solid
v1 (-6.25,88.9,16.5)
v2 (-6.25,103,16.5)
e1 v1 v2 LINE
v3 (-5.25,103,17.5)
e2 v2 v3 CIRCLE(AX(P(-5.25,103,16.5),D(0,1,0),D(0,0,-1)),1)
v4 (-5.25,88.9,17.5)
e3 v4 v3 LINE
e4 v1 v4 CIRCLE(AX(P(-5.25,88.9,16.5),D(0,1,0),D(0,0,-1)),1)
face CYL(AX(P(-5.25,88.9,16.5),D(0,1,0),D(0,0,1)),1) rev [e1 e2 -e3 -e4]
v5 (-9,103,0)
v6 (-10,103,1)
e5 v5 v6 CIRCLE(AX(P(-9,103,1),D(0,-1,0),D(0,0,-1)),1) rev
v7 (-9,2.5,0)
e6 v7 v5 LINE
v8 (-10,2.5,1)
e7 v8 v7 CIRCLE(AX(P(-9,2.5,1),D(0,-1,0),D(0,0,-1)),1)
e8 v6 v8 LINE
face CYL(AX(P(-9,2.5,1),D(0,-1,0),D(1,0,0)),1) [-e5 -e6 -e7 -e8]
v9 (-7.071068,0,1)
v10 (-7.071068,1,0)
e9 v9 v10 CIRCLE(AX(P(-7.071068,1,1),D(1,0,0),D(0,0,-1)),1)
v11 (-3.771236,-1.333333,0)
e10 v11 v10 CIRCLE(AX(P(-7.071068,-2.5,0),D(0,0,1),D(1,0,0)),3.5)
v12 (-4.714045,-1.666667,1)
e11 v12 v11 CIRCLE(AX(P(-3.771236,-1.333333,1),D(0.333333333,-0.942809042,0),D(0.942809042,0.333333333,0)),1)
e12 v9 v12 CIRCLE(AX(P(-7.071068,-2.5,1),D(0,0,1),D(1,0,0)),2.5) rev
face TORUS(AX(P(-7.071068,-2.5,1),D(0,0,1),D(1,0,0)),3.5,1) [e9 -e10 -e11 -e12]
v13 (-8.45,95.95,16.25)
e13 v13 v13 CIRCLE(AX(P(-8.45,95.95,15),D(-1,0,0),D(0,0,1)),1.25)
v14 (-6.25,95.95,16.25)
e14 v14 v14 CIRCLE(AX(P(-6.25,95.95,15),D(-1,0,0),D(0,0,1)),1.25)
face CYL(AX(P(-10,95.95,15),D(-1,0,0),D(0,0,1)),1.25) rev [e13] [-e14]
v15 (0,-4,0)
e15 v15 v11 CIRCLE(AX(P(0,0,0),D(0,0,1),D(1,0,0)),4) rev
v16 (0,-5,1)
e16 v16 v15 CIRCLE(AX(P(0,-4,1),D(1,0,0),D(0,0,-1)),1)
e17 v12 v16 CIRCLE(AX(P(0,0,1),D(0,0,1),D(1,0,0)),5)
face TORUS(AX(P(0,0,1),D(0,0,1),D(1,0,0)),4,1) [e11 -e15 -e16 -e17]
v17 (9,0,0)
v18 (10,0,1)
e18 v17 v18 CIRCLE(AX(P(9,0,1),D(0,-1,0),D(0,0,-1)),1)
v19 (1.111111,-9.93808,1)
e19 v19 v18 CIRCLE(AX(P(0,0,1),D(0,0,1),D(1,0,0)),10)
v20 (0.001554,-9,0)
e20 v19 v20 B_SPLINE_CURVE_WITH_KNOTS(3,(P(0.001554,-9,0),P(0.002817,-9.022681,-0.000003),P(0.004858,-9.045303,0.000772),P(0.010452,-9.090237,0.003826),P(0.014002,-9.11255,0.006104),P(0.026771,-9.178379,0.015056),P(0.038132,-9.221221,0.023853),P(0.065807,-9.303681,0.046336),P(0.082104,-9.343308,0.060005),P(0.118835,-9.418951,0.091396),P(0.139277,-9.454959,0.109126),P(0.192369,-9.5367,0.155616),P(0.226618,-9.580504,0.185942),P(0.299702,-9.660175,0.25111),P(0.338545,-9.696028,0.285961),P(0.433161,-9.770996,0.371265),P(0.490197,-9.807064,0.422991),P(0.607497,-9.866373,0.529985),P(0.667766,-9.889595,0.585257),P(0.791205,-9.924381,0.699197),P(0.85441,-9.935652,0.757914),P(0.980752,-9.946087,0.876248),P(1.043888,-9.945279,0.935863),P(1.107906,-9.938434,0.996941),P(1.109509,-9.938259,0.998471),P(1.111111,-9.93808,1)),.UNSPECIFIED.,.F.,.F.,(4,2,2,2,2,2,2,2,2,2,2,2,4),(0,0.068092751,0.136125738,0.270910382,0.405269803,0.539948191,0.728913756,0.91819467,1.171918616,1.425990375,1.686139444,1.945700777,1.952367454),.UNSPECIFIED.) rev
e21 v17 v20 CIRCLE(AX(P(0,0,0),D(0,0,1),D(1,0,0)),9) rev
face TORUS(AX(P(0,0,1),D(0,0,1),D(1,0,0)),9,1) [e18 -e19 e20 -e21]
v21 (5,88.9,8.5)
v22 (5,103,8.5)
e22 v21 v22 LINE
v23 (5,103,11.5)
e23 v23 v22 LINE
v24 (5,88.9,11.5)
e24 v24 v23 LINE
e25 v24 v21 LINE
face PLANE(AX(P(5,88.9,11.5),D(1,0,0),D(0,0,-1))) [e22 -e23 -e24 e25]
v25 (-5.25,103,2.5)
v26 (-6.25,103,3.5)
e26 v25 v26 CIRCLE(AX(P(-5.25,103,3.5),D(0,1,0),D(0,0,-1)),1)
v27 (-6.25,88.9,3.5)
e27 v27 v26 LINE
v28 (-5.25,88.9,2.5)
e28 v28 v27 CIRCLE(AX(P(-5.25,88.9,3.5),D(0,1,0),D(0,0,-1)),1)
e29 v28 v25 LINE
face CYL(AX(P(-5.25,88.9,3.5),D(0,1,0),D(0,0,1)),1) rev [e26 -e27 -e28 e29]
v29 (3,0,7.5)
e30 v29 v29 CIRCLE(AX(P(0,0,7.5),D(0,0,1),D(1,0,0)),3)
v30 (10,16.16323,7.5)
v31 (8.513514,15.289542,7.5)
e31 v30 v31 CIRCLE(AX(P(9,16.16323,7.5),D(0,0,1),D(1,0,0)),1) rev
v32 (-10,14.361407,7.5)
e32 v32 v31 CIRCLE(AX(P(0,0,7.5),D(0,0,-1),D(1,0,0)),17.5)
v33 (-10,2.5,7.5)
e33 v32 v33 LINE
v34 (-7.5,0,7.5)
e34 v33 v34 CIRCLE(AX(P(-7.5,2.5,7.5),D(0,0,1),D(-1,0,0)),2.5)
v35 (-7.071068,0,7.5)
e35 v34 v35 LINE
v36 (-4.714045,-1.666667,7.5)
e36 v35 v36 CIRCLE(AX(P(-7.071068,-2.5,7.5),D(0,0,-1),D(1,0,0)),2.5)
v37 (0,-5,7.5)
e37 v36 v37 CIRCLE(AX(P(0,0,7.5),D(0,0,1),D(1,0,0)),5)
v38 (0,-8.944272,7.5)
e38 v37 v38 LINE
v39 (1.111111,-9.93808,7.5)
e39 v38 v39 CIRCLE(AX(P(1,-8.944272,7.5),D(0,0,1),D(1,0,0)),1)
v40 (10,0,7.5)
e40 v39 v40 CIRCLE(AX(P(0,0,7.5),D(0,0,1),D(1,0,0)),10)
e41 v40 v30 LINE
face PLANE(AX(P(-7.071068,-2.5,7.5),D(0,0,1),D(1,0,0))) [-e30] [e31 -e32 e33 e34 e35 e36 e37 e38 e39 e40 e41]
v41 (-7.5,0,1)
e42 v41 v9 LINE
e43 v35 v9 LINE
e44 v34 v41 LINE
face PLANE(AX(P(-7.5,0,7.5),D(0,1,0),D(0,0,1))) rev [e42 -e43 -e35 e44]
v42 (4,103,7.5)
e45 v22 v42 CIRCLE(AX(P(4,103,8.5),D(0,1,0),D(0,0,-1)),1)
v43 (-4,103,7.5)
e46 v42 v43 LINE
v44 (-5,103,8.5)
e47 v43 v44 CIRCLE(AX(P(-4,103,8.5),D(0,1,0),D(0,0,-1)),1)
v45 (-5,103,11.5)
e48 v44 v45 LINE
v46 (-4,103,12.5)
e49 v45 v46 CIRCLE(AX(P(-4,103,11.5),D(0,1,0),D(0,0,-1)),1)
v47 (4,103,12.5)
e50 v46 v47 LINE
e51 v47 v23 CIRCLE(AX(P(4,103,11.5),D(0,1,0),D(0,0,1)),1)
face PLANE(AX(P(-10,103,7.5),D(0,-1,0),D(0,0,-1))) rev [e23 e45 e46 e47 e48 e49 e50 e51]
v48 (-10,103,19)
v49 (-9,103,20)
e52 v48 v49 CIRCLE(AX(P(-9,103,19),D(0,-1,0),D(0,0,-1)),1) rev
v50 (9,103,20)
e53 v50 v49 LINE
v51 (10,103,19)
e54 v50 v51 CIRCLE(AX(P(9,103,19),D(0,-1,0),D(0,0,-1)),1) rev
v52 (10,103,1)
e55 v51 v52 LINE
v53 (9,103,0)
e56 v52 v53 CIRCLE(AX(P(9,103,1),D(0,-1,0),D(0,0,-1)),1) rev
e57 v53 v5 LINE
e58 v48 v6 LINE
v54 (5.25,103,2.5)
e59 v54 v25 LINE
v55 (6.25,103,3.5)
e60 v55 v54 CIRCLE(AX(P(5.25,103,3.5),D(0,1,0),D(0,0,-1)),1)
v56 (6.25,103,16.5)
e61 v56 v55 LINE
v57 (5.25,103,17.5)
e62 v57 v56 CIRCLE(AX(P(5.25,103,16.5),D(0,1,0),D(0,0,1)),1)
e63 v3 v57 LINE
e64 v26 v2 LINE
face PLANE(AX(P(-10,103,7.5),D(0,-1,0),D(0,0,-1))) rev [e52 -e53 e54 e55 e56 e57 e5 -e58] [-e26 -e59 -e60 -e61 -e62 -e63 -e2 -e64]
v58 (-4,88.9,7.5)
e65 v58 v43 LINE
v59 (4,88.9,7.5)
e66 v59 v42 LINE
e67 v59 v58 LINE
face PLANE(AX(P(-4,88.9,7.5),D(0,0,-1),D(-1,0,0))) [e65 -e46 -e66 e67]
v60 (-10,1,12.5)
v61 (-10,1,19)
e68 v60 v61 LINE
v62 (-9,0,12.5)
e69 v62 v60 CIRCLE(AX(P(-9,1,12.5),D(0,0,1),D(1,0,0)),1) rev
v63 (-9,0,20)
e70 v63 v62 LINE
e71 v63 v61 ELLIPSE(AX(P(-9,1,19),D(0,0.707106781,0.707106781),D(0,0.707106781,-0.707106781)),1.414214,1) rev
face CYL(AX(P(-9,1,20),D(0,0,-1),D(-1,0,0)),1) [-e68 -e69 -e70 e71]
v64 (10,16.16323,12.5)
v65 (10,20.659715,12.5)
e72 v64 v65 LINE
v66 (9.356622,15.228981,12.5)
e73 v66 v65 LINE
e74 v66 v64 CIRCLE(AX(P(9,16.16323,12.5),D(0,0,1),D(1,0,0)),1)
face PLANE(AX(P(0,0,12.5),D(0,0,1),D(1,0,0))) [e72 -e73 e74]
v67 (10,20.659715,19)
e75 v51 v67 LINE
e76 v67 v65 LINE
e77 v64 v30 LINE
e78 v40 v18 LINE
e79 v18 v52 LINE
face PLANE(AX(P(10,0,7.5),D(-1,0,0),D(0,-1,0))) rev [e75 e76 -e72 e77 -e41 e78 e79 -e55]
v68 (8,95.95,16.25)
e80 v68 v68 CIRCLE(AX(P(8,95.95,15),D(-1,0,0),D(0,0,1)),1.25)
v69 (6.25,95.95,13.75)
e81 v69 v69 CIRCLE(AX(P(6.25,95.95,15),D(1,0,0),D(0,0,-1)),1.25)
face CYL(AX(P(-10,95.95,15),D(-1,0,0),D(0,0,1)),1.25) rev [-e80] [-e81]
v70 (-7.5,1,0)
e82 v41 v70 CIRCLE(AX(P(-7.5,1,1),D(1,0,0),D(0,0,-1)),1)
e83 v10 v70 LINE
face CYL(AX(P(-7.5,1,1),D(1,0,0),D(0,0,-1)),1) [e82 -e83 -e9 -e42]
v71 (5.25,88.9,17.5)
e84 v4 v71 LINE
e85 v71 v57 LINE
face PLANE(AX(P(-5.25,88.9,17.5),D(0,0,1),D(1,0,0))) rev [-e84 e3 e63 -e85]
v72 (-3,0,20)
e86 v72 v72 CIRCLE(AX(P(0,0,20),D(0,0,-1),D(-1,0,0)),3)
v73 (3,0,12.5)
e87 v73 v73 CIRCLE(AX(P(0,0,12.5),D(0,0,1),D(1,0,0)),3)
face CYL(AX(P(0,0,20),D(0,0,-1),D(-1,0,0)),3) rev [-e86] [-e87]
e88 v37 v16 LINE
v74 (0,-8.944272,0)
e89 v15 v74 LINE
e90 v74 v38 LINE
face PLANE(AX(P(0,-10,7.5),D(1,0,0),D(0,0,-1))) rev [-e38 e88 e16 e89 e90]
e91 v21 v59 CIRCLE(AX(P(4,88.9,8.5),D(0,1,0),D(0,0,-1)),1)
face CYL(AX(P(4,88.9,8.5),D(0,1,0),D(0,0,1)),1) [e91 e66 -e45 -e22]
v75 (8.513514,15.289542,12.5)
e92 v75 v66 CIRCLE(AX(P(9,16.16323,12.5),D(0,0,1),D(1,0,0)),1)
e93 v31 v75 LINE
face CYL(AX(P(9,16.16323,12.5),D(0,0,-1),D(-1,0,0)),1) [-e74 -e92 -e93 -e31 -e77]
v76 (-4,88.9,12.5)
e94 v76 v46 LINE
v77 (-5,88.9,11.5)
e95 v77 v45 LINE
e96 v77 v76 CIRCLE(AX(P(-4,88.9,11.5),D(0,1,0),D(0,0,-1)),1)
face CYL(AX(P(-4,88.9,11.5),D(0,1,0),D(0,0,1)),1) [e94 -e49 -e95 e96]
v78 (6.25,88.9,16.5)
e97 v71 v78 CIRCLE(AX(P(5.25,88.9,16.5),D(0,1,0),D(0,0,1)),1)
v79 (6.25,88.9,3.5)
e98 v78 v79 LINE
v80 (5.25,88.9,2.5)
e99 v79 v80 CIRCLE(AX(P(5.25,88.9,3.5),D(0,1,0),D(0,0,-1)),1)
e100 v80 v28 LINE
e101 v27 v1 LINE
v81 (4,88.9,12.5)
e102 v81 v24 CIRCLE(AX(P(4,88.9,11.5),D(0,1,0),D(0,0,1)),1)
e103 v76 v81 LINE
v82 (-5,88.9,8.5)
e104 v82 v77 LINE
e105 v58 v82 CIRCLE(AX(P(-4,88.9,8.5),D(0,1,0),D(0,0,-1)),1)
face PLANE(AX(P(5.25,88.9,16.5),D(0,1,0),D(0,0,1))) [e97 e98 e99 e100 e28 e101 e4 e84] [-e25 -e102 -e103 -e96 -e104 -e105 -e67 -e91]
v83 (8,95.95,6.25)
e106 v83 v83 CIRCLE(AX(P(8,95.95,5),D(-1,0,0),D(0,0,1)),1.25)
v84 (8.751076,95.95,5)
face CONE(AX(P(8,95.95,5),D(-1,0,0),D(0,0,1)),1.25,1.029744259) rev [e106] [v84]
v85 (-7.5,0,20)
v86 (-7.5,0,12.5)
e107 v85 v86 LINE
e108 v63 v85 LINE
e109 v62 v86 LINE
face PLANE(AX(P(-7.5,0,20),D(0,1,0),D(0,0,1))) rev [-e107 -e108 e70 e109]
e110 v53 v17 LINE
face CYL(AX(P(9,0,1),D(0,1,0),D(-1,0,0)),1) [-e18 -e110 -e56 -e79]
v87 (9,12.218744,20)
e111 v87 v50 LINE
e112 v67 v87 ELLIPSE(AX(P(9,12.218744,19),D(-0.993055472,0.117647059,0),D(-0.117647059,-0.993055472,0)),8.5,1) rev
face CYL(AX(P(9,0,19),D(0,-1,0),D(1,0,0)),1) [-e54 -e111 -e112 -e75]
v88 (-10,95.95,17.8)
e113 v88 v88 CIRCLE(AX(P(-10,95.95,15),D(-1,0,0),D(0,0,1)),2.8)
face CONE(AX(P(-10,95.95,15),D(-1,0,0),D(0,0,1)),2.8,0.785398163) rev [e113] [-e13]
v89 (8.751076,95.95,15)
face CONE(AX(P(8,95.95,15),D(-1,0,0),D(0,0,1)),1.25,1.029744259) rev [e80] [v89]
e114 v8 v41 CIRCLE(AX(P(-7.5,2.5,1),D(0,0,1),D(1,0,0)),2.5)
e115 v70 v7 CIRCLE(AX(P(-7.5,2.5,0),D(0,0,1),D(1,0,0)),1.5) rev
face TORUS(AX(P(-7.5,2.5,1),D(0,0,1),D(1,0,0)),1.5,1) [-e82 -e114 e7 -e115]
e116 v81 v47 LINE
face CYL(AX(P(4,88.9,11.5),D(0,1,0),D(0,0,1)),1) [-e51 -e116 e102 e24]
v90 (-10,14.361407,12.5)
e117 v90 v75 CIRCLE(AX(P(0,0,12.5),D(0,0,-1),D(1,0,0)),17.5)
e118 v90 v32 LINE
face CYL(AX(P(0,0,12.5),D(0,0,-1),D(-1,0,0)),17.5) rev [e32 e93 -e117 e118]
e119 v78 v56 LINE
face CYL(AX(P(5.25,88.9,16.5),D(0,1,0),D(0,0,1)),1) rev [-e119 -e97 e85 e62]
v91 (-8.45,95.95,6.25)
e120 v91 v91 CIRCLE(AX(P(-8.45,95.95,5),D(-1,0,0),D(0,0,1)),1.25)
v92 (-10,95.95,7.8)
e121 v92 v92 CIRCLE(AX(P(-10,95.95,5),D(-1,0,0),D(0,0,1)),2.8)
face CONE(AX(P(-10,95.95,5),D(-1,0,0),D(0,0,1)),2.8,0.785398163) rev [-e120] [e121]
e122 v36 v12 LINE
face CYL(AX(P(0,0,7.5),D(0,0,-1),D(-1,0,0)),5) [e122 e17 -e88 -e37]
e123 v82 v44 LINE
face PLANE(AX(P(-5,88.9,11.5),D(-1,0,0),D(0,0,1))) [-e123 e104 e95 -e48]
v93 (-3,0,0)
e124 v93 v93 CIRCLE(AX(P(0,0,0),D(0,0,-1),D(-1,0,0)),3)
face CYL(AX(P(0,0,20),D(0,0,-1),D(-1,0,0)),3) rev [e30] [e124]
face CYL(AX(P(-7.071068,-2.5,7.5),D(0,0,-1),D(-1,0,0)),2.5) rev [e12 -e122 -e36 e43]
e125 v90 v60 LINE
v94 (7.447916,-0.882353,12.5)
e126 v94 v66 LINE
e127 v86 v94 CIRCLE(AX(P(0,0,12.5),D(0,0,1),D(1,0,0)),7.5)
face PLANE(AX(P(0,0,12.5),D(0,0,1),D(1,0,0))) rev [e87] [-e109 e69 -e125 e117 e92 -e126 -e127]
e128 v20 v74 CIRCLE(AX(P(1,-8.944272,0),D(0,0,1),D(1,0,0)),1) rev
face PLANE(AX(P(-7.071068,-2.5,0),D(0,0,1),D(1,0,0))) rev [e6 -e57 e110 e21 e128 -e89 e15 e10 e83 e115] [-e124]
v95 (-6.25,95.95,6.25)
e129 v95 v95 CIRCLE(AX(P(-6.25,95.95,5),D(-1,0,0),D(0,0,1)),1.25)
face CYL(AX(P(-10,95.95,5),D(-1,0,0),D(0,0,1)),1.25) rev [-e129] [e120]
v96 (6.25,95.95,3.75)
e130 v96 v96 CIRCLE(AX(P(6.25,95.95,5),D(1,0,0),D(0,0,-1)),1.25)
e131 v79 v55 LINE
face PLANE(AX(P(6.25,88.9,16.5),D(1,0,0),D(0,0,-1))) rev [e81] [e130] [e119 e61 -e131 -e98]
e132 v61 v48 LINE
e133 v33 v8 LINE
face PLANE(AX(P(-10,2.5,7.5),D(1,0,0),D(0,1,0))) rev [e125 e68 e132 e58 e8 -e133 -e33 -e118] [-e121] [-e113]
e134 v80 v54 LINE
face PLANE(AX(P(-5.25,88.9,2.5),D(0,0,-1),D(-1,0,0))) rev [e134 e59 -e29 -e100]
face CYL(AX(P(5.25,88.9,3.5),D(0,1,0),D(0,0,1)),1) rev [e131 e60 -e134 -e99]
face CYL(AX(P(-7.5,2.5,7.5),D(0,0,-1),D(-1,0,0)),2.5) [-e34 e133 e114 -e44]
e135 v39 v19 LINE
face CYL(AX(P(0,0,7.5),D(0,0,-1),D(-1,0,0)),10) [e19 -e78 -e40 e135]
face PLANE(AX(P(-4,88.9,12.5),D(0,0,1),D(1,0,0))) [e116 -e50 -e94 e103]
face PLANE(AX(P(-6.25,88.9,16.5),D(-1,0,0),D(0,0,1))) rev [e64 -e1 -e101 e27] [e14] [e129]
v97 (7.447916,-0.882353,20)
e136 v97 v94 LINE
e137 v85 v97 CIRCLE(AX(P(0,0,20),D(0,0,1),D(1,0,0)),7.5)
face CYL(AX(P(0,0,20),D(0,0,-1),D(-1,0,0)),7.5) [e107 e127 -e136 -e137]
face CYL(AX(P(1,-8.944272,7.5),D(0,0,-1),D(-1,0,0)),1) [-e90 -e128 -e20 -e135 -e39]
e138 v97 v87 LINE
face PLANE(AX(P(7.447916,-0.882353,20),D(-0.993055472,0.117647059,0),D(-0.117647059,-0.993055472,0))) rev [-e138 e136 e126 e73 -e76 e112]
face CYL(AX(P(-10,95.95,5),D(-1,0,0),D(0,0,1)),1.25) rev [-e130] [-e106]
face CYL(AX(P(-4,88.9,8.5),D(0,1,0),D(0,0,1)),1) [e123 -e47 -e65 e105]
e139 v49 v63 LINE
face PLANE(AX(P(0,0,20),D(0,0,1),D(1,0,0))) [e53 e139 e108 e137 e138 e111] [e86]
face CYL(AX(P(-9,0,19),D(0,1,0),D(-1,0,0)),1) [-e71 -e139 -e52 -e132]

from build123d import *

# Parameters (mm, degrees)
BOSS_EXTRUDE1_DEPTH             = 7.5
BOSS_EXTRUDE2_DEPTH             = 5
BOSS_EXTRUDE3_DEPTH             = 7.5
SKETCH4_R                       = 3
CUT_EXTRUDE1_DEPTH              = 106.399240984
CUT_EXTRUDE2_DEPTH              = 14.1
FILLET1_R                       = 1
M3X0_5_TAPPED_HOLE1_D           = 2.5
M3X0_5_TAPPED_HOLE1_DEPTH       = 18
M3X0_5_TAPPED_HOLE1_CSINK_D     = 5.6
M3X0_5_TAPPED_HOLE1_CSINK_ANGLE = 90
M3X0_5_TAPPED_HOLE1_TIP         = 0.751075774


with BuildPart() as part:
    # Sketch1 → Boss-Extrude1 (new body)
    with BuildSketch(Plane.XY):
        with BuildLine():
            Line((0, -10), (0, -5))
            ThreePointArc((0, -5), (-2.886751346, -4.082482905), (-4.714045208, -1.666666667))
            ThreePointArc((-4.714045208, -1.666666667), (-5.627692139, -0.458758548), (-7.071067812, 0))
            Line((-7.071067812, 0), (-7.5, 0))
            ThreePointArc((-7.5, 0), (-9.267766953, 0.732233047), (-10, 2.5))
            Line((-10, 2.5), (-10, 103))
            Line((-10, 103), (10, 103))
            Line((10, 103), (10, 0))
            ThreePointArc((10, 0), (7.071067812, -7.071067812), (0, -10))
        make_face()
    extrude(amount=BOSS_EXTRUDE1_DEPTH)

    # Sketch2 → Boss-Extrude2 (add)
    with BuildSketch(Plane.XY.offset(7.5)):
        with BuildLine():
            Line((-10, 103), (10, 103))
            Line((10, 103), (10, 14.361406616))
            ThreePointArc((10, 14.361406616), (0, 17.5), (-10, 14.361406616))
            Line((-10, 14.361406616), (-10, 103))
        make_face()
    extrude(amount=BOSS_EXTRUDE2_DEPTH)

    # Sketch3 → Boss-Extrude3 (add)
    with BuildSketch(Plane.XY.offset(12.5)):
        with BuildLine():
            Line((7.447916037, -0.882352941), (10, 20.659715081))
            Line((10, 20.659715081), (10, 103))
            Line((10, 103), (-10, 103))
            Line((-10, 103), (-10, 0))
            Line((-10, 0), (-7.5, 0))
            ThreePointArc((-7.5, 0), (-0.441944412, -7.486967686), (7.447916037, -0.882352941))
        make_face()
    extrude(amount=BOSS_EXTRUDE3_DEPTH)

    # Sketch4 → Cut-Extrude1 (cut, through all)
    with BuildSketch(Plane(origin=(0, 0, 0), x_dir=(-1, 0, 0), z_dir=(0, 0, -1))):
        Circle(SKETCH4_R)
    extrude(amount=-CUT_EXTRUDE1_DEPTH, mode=Mode.SUBTRACT)

    # Sketch5 → Cut-Extrude2 (cut)
    with BuildSketch(Plane(origin=(0, 103, 0), x_dir=(1, 0, 0), z_dir=(0, 1, 0))):
        with BuildLine():
            Line((-5.25, -17.5), (5.25, -17.5))
            ThreePointArc((5.25, -17.5), (5.957106781, -17.207106781), (6.25, -16.5))
            Line((6.25, -16.5), (6.25, -3.5))
            ThreePointArc((6.25, -3.5), (5.957106781, -2.792893219), (5.25, -2.5))
            Line((5.25, -2.5), (-5.25, -2.5))
            ThreePointArc((-5.25, -2.5), (-5.957106781, -2.792893219), (-6.25, -3.5))
            Line((-6.25, -3.5), (-6.25, -16.5))
            ThreePointArc((-6.25, -16.5), (-5.957106781, -17.207106781), (-5.25, -17.5))
        make_face()
        with BuildLine():
            Line((-4, -12.5), (4, -12.5))
            ThreePointArc((4, -12.5), (4.707106781, -12.207106781), (5, -11.5))
            Line((5, -11.5), (5, -8.5))
            ThreePointArc((5, -8.5), (4.707106781, -7.792893219), (4, -7.5))
            Line((4, -7.5), (-4, -7.5))
            ThreePointArc((-4, -7.5), (-4.707106781, -7.792893219), (-5, -8.5))
            Line((-5, -8.5), (-5, -11.5))
            ThreePointArc((-5, -11.5), (-4.707106781, -12.207106781), (-4, -12.5))
        make_face(mode=Mode.SUBTRACT)
    extrude(amount=-CUT_EXTRUDE2_DEPTH, mode=Mode.SUBTRACT)

    # Fillet1
    # the kernel refuses this fillet: 1 mm, written as the material it takes off along each edge
    with BuildSketch(Plane(origin=(10, 105.5, 0), x_dir=(-1, 0, 0), z_dir=(0, -1, 0))) as fillet1_piece_1:
        with BuildLine():
            CenterArc((FILLET1_R, -FILLET1_R), FILLET1_R, 90, 90)
            Line((0, -FILLET1_R), (0, 0))
            Line((0, 0), (FILLET1_R, 0))
        make_face()
    extrude(amount=105.5, mode=Mode.SUBTRACT)
    with BuildSketch(Plane(origin=(0, 0, 0), x_dir=(1, 0, 0), z_dir=(0, 1, 0))) as fillet1_piece_2:
        with BuildLine():
            CenterArc((10 - FILLET1_R, -FILLET1_R), FILLET1_R, 0, 90)
            Line((10 - FILLET1_R, 0), (10, 0))
            Line((10, 0), (10, -FILLET1_R))
        make_face()
    revolve(axis=Axis((0, 0, 0), (0, 0, -1)), revolution_arc=104.329698924, mode=Mode.SUBTRACT)
    with BuildSketch(Plane(origin=(0, 0, 0), x_dir=(0, -1, 0), z_dir=(1, 0, 0))) as fillet1_piece_3:
        with BuildLine():
            CenterArc((5 - FILLET1_R, -FILLET1_R), FILLET1_R, 0, 90)
            Line((5 - FILLET1_R, 0), (5, 0))
            Line((5, 0), (5, -FILLET1_R))
        make_face()
    revolve(axis=Axis((0, 0, 0), (0, 0, -1)), revolution_arc=70.528779366, mode=Mode.SUBTRACT)
    with BuildSketch(Plane(origin=(-7.071067812, -2.5, 0), x_dir=(0.9428090415820636, 0.3333333333333328, 0), z_dir=(0.3333333333333328, -0.9428090415820636, 0))) as fillet1_piece_4:
        with BuildLine():
            CenterArc((2.5 + FILLET1_R, FILLET1_R), FILLET1_R, 180, 90)
            Line((2.5, FILLET1_R), (2.5, 0))
            Line((2.5, 0), (2.5 + FILLET1_R, 0))
        make_face()
    revolve(axis=Axis((-7.071067812, -2.5, 0), (0, 0, 1)), revolution_arc=70.528779366, mode=Mode.SUBTRACT)
    with BuildSketch(Plane(origin=(0, -10, -2.782087795), x_dir=(0, 1, 0), z_dir=(0, 0, 1))) as fillet1_piece_5:
        with BuildLine():
            CenterArc((1.05572809, -1), FILLET1_R, 90, 96.379370208)
            ThreePointArc((0.0619201, -1.111111111), (0.015492025, -0.556417559), (0, 0))
            Line((0, 0), (1.05572809, 0))
        make_face()
    extrude(amount=13.06417559, mode=Mode.SUBTRACT)
    with BuildSketch(Plane(origin=(10, 14.361406616, 7.5), x_dir=(0, 1, 0), z_dir=(0, 0, 1))) as fillet1_piece_6:
        with BuildLine():
            CenterArc((1.801823259, 1), FILLET1_R, 150.89009106, 119.10990894)
            ThreePointArc((0.928135158, 1.486486486), (0.482686338, 0.731618028), (0, 0))
            Line((0, 0), (1.801823259, 0))
        make_face()
    extrude(amount=5, mode=Mode.SUBTRACT)
    with BuildSketch(Plane(origin=(-10, 0, 10), x_dir=(0, 1, 0), z_dir=(0, 0, 1))) as fillet1_piece_7:
        with BuildLine():
            CenterArc((FILLET1_R, -FILLET1_R), FILLET1_R, 90, 90)
            Line((0, -FILLET1_R), (0, 0))
            Line((0, 0), (FILLET1_R, 0))
        make_face()
    extrude(amount=12.5, mode=Mode.SUBTRACT)
    with BuildSketch(Plane(origin=(10, 8.159715081, 20), x_dir=(0, 0, -1), z_dir=(0, 1, 0))) as fillet1_piece_8:
        with BuildLine():
            CenterArc((FILLET1_R, FILLET1_R), FILLET1_R, 180, 90)
            Line((0, FILLET1_R), (0, 0))
            Line((0, 0), (FILLET1_R, 0))
        make_face()
    extrude(amount=97.340284919, mode=Mode.SUBTRACT)
    with BuildSketch(Plane(origin=(-10, 105.5, 20), x_dir=(0, 0, -1), z_dir=(0, -1, 0))) as fillet1_piece_9:
        with BuildLine():
            CenterArc((FILLET1_R, FILLET1_R), FILLET1_R, 180, 90)
            Line((0, FILLET1_R), (0, 0))
            Line((0, 0), (FILLET1_R, 0))
        make_face()
    extrude(amount=108, mode=Mode.SUBTRACT)
    with BuildSketch(Plane(origin=(-7.071067812, 0, 0), x_dir=(0, 1, 0), z_dir=(-1, 0, 0))) as fillet1_piece_10:
        with BuildLine():
            CenterArc((FILLET1_R, -FILLET1_R), FILLET1_R, 90, 90)
            Line((0, -FILLET1_R), (0, 0))
            Line((0, 0), (FILLET1_R, 0))
        make_face()
    extrude(amount=0.428932188, mode=Mode.SUBTRACT)
    with BuildSketch(Plane(origin=(-7.5, 2.5, 0), x_dir=(0, -1, 0), z_dir=(1, 0, 0))) as fillet1_piece_11:
        with BuildLine():
            CenterArc((2.5 - FILLET1_R, -FILLET1_R), FILLET1_R, 0, 90)
            Line((2.5, -FILLET1_R), (2.5, 0))
            Line((2.5, 0), (2.5 - FILLET1_R, 0))
        make_face()
    revolve(axis=Axis((-7.5, 2.5, 0), (0, 0, -1)), revolution_arc=90, mode=Mode.SUBTRACT)
    with BuildSketch(Plane(origin=(-10, 2.5, 0), x_dir=(1, 0, 0), z_dir=(0, 1, 0))) as fillet1_piece_12:
        with BuildLine():
            CenterArc((FILLET1_R, -FILLET1_R), FILLET1_R, 90, 90)
            Line((0, -FILLET1_R), (0, 0))
            Line((0, 0), (FILLET1_R, 0))
        make_face()
    extrude(amount=103, mode=Mode.SUBTRACT)

    # M3x0.5 Tapped Hole1
    with Locations(Plane.ZY.offset(10)):
        with Locations((15, 95.95), (5, 95.95)):
            CounterSinkHole(M3X0_5_TAPPED_HOLE1_D / 2, M3X0_5_TAPPED_HOLE1_CSINK_D / 2, depth=M3X0_5_TAPPED_HOLE1_DEPTH, counter_sink_angle=M3X0_5_TAPPED_HOLE1_CSINK_ANGLE)
            with Locations((0, 0, -(M3X0_5_TAPPED_HOLE1_DEPTH + M3X0_5_TAPPED_HOLE1_TIP / 2))):  # 118° drill point
                Cone(0, M3X0_5_TAPPED_HOLE1_D / 2, M3X0_5_TAPPED_HOLE1_TIP, mode=Mode.SUBTRACT)


solid = part.part
